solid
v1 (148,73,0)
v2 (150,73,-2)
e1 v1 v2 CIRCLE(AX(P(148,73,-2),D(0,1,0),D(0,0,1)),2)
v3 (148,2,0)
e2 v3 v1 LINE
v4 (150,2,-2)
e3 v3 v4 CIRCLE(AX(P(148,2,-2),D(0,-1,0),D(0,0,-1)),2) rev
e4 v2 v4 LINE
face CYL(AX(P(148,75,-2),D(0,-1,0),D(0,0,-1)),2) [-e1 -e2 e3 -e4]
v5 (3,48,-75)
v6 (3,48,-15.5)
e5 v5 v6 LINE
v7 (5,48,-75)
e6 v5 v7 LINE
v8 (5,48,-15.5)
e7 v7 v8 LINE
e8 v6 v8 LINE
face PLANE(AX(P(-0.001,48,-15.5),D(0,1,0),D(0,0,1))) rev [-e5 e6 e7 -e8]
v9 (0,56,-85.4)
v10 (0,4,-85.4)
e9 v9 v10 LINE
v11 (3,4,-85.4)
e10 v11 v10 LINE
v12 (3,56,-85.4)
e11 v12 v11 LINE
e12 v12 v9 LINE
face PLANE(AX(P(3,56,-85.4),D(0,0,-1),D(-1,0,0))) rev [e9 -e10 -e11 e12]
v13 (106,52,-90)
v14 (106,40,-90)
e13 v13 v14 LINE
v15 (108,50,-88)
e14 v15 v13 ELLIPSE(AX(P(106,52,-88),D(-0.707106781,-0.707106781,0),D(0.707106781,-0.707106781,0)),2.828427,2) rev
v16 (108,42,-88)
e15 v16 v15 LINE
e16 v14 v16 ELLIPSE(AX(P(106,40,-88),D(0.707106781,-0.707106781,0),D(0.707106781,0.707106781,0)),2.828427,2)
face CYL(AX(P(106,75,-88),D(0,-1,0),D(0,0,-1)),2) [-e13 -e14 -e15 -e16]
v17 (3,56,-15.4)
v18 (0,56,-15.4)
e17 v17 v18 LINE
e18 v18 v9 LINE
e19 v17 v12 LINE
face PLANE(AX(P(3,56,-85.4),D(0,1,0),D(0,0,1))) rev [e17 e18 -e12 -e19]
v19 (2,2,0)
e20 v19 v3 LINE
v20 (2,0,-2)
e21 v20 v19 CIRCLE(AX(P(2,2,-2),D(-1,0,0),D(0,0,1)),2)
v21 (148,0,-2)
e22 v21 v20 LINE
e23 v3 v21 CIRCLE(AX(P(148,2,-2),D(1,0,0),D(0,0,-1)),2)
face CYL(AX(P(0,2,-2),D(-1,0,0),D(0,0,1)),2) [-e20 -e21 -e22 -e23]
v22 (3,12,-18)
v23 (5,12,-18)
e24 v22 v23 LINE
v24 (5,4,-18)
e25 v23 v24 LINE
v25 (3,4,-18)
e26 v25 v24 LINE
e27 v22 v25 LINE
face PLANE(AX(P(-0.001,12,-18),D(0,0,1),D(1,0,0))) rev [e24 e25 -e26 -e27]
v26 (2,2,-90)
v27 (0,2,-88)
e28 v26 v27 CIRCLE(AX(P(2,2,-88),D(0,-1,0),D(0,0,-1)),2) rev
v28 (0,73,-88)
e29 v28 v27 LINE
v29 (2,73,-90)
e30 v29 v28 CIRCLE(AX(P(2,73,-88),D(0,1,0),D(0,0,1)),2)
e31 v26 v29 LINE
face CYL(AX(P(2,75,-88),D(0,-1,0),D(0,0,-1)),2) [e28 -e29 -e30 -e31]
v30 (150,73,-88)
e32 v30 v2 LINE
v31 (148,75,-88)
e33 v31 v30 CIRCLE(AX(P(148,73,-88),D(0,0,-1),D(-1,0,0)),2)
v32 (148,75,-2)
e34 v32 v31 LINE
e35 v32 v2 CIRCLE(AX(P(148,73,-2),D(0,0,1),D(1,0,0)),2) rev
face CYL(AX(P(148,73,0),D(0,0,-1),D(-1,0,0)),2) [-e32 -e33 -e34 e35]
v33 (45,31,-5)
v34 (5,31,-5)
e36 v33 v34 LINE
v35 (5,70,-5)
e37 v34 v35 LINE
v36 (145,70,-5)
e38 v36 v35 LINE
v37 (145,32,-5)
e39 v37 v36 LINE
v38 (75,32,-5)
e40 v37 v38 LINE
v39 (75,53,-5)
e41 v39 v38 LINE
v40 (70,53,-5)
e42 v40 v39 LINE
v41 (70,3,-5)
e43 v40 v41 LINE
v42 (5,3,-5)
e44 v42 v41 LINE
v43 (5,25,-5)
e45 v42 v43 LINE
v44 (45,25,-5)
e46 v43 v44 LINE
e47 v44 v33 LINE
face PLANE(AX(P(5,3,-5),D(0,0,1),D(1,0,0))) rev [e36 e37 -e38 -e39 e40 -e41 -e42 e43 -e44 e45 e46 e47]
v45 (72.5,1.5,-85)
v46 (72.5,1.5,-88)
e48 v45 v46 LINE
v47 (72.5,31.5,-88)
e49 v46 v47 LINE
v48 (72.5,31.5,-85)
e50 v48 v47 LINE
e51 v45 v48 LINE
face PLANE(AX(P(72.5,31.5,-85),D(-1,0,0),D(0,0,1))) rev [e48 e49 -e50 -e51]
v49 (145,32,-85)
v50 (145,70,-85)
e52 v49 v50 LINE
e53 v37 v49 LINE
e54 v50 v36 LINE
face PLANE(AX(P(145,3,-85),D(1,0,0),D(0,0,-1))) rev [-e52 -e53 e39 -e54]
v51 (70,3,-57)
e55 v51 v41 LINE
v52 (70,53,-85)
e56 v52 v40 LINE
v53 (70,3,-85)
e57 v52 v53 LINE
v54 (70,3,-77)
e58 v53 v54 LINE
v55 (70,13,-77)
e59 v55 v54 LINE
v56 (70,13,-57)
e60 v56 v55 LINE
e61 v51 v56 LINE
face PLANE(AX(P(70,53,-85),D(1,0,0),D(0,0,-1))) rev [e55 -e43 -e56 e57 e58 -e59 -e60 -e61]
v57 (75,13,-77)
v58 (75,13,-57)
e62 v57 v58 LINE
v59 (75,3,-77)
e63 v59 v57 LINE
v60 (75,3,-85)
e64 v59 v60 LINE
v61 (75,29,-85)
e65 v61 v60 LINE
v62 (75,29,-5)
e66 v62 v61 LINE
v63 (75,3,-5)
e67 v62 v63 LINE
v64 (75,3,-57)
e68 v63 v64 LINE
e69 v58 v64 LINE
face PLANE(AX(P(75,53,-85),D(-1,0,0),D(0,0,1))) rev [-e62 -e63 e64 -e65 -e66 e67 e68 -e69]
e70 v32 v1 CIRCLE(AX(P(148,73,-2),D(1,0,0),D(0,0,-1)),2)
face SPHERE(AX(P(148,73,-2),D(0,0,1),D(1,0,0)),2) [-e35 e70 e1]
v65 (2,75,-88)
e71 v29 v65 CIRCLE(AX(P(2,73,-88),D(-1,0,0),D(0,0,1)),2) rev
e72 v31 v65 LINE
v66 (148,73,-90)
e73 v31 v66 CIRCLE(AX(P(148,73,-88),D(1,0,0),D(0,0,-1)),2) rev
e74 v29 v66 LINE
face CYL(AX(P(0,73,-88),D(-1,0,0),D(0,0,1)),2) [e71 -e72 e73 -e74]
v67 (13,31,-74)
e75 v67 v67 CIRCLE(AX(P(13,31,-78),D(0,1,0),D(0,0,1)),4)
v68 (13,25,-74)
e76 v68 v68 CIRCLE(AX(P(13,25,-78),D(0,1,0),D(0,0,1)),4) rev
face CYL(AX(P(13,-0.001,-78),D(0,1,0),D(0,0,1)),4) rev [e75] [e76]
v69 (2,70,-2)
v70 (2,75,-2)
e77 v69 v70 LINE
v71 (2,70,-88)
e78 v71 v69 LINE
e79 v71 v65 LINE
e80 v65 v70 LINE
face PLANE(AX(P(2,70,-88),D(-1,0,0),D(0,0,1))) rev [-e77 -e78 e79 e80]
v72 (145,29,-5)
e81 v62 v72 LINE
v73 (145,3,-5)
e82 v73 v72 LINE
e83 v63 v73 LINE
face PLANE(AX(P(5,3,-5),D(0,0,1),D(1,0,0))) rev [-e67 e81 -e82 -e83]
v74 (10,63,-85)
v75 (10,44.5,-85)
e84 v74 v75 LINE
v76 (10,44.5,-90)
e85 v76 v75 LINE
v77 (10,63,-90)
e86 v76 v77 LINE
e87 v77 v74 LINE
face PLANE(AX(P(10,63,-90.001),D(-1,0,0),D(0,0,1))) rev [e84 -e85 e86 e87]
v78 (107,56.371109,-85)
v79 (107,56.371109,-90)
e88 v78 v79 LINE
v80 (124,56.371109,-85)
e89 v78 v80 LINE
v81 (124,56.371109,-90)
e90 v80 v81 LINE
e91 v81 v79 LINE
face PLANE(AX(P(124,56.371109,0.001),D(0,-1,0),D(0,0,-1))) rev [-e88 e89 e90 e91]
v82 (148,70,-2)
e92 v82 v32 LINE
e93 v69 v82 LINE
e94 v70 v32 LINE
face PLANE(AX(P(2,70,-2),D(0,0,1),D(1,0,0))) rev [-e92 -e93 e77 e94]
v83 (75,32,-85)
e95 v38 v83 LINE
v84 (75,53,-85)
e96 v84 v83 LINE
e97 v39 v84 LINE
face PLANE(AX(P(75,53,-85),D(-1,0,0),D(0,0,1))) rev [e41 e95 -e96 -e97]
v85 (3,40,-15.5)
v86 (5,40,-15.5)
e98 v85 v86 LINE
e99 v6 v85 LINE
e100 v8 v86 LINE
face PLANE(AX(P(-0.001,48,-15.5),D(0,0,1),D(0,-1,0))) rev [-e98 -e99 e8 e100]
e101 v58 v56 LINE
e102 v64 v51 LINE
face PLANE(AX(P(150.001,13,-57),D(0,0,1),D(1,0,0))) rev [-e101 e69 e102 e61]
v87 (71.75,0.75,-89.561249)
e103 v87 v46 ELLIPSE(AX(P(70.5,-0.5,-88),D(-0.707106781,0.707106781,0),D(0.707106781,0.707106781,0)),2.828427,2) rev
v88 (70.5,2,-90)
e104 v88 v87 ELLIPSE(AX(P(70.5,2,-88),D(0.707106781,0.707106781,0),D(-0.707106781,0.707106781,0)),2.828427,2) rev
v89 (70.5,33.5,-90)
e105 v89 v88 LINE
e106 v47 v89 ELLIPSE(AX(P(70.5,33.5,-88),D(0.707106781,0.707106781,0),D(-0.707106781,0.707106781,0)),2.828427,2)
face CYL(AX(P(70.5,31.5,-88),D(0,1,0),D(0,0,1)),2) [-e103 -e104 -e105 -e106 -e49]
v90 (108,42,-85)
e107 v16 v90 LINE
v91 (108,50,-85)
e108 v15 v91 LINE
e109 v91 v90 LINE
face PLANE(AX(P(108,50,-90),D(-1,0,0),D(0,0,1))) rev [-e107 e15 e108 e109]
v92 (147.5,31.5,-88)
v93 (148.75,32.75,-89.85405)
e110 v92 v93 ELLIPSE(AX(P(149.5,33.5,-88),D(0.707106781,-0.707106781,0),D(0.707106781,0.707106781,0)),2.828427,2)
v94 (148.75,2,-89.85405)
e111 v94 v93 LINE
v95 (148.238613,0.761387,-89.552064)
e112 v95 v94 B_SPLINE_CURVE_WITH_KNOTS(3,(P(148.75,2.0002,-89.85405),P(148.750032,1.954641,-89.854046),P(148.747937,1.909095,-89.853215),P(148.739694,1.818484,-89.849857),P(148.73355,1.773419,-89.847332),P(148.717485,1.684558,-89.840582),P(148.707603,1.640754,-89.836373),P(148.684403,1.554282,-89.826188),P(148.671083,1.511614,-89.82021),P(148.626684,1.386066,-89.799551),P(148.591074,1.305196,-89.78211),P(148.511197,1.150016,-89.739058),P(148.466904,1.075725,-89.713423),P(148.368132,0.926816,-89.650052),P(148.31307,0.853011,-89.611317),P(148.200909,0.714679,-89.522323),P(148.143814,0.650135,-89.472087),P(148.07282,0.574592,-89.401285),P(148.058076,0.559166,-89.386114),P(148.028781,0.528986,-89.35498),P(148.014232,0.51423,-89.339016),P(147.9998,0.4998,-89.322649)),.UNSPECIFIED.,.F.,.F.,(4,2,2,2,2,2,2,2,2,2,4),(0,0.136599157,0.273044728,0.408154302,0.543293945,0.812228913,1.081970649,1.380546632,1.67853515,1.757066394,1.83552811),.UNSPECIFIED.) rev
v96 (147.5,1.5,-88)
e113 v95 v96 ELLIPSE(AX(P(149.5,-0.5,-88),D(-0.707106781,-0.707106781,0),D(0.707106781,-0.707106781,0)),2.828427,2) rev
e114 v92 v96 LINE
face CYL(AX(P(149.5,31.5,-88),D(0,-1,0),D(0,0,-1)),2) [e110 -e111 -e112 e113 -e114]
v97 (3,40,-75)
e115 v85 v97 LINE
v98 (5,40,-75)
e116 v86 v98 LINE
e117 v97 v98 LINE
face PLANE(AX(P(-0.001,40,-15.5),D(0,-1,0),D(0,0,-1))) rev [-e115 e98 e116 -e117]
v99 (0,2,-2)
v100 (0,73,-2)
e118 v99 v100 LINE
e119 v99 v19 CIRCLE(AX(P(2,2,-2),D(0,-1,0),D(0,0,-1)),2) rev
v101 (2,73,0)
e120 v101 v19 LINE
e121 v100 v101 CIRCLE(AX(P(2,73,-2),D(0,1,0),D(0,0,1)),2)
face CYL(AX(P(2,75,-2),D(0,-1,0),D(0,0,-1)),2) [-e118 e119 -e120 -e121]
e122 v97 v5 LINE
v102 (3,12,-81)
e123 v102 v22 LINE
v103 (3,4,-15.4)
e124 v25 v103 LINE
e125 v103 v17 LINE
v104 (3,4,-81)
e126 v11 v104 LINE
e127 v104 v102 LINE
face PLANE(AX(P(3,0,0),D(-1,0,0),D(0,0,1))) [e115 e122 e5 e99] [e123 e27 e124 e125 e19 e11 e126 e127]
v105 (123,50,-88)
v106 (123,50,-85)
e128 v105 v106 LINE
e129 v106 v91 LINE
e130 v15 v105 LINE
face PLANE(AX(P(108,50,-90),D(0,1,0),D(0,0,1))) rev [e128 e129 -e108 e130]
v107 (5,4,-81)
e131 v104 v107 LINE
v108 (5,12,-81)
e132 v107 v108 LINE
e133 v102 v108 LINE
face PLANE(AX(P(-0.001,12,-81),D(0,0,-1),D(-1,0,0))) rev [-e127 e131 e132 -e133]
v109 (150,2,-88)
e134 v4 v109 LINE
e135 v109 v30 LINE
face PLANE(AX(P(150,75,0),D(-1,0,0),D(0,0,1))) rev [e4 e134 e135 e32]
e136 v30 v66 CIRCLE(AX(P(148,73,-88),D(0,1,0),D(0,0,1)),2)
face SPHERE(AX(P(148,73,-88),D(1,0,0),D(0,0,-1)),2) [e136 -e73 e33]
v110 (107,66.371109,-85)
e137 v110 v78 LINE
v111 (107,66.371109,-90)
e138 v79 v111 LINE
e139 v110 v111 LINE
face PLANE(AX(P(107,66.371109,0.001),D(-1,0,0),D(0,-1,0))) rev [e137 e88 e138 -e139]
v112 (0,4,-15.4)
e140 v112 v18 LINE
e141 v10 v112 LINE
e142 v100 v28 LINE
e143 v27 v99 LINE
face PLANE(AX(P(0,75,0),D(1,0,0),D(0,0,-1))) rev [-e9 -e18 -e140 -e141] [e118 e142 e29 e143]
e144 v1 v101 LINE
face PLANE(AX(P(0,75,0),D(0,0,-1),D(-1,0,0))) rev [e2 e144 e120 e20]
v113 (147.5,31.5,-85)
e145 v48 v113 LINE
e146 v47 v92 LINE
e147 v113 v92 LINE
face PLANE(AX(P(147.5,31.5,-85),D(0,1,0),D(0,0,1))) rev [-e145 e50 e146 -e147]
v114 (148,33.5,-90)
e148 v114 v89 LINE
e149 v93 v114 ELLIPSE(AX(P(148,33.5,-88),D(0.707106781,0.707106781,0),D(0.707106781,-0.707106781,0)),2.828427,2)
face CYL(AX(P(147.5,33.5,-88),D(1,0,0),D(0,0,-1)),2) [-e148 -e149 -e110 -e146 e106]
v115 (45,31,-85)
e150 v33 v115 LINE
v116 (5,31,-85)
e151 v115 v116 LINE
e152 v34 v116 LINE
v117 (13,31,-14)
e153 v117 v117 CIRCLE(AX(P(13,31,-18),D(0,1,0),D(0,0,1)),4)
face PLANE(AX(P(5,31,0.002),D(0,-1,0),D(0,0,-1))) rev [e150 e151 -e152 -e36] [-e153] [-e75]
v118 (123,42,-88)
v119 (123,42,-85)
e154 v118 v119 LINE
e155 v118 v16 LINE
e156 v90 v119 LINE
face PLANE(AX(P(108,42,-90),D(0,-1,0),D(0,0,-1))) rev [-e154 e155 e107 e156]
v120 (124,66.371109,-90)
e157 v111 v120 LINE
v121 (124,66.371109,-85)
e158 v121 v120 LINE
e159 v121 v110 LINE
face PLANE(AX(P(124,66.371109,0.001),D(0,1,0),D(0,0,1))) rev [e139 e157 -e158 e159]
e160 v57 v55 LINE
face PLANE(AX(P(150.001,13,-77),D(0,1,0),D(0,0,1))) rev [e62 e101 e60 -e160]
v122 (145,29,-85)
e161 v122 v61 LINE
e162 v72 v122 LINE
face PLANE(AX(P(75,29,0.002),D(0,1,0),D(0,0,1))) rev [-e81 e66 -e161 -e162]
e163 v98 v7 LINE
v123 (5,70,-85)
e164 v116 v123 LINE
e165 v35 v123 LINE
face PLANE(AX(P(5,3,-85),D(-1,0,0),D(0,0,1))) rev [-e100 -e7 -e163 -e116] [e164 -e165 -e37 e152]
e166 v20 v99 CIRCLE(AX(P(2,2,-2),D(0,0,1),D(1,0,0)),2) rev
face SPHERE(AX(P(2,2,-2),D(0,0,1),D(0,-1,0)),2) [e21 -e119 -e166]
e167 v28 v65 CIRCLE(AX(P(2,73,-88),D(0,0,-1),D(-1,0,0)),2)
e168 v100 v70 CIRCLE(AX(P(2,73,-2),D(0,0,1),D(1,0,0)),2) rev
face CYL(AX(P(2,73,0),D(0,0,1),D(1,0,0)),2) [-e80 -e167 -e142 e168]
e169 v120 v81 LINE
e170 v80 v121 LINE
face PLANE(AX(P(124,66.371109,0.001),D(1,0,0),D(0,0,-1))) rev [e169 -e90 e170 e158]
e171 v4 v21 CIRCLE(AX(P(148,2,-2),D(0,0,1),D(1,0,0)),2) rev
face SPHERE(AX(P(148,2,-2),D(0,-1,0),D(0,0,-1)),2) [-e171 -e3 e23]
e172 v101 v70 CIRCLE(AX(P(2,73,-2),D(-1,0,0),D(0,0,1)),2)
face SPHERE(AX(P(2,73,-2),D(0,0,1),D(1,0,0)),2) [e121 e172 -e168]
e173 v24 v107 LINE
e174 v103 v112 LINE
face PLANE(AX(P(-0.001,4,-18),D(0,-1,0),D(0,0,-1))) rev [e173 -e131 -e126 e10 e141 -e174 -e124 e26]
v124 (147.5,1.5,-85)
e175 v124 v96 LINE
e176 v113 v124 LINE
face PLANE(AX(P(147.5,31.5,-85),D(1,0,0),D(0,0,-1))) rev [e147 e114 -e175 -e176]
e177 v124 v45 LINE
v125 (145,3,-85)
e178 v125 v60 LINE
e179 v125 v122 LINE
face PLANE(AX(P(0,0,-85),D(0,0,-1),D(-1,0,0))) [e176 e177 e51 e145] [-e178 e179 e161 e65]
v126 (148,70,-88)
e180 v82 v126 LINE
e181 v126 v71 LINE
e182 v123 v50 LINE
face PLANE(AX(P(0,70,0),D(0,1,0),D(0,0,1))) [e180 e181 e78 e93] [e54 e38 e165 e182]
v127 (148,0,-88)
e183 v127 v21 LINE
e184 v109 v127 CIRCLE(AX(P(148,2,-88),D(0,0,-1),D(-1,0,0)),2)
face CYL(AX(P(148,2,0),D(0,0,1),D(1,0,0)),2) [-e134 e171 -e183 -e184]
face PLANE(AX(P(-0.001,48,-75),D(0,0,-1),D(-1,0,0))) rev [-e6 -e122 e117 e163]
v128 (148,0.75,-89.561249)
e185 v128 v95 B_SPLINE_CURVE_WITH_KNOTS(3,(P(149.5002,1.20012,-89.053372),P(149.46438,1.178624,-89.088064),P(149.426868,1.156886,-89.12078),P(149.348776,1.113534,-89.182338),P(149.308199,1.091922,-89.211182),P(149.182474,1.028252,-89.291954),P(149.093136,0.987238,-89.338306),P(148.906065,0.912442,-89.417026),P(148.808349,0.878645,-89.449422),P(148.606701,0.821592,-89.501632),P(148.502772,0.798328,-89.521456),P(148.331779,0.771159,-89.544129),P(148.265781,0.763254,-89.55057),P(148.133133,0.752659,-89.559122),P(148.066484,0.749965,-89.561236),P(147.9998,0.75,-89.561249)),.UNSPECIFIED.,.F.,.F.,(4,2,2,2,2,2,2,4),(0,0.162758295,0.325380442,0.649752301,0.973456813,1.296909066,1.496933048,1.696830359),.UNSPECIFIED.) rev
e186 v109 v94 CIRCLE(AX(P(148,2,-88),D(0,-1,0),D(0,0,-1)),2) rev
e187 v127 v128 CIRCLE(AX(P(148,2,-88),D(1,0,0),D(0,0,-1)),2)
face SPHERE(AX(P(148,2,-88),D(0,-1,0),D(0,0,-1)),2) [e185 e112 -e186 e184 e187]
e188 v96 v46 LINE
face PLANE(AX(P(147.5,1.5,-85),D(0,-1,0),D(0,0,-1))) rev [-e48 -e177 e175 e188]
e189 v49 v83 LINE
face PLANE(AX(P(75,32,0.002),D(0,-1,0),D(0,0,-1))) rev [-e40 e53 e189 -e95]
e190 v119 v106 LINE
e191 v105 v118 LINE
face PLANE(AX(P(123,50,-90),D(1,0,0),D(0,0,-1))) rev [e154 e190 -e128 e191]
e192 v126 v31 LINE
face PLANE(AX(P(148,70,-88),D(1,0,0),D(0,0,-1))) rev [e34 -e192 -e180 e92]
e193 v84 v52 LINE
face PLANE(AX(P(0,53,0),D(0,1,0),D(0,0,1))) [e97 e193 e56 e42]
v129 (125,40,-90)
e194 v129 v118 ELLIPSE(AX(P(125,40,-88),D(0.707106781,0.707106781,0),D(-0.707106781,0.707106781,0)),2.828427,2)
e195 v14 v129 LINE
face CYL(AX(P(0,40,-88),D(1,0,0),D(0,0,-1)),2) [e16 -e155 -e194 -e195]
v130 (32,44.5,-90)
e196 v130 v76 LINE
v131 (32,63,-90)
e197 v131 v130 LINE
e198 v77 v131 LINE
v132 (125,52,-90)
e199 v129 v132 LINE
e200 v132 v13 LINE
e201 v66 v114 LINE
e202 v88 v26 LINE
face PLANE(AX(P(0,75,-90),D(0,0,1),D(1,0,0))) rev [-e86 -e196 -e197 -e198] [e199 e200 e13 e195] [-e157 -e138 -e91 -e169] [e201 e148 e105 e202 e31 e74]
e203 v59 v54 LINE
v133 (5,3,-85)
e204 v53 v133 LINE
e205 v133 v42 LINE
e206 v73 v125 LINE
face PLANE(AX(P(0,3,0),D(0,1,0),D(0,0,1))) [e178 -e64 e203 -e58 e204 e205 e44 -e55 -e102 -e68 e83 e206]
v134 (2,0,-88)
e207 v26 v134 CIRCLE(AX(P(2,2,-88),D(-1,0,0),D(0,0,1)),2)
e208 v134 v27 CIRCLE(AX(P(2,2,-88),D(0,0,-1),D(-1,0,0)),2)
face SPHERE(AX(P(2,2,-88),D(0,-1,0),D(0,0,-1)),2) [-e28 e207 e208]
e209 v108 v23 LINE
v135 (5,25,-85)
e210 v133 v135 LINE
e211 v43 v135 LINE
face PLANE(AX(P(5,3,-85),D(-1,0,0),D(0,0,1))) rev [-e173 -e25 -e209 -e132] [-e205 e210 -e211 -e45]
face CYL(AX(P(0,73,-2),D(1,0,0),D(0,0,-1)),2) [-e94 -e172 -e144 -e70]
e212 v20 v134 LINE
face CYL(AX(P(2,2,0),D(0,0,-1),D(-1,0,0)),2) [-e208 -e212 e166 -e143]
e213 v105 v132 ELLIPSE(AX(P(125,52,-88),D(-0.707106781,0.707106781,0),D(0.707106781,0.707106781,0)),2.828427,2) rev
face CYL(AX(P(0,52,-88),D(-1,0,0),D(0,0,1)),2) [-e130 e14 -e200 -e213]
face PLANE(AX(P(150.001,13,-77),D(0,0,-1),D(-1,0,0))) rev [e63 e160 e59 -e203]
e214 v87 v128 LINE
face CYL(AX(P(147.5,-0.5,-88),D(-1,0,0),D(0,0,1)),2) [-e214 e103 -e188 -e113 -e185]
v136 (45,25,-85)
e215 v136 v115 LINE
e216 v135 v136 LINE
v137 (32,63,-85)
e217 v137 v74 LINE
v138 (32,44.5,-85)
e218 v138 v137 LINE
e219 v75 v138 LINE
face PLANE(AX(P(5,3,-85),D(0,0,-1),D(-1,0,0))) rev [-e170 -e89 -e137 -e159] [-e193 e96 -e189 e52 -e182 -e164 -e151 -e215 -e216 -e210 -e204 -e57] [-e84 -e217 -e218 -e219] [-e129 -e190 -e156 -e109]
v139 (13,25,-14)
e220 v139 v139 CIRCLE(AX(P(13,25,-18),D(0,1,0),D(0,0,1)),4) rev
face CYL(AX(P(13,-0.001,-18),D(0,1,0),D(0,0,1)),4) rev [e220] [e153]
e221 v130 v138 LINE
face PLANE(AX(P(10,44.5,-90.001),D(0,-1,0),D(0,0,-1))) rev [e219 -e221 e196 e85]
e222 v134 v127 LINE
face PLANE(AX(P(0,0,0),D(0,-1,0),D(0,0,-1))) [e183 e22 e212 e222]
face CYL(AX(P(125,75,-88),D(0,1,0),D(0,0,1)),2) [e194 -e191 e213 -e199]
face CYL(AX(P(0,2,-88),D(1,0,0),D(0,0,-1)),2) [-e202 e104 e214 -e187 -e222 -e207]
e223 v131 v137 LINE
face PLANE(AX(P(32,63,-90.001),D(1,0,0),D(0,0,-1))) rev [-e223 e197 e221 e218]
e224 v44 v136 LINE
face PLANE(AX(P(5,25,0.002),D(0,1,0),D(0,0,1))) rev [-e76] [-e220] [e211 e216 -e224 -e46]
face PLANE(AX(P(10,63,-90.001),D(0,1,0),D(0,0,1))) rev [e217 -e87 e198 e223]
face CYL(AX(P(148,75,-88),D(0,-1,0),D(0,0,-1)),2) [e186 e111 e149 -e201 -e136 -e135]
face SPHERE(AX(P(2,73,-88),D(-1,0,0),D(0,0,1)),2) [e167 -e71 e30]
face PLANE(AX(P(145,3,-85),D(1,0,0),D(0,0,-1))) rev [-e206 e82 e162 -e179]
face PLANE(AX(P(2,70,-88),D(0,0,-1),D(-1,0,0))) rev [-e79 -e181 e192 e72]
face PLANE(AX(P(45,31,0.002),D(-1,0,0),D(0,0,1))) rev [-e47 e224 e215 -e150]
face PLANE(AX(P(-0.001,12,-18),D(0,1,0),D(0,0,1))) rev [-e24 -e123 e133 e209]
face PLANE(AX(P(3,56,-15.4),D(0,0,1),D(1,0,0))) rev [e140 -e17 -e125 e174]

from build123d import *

# Parameters (mm, degrees)
SKETCH_2_W           = 150
SKETCH_2_H           = 90
EXTRUDE_1_DEPTH      = 75
SKETCH_3_W           = 140
SKETCH_3_H           = 80
CUT_EXTRUDE_2_DEPTH  = 72
SKETCH_6_W           = 5
SKETCH_6_H           = 80
EXTRUDE_2_DEPTH      = 50
EXTRUDE_3_REACH      = 190.016
SKETCH_8_W           = 70
SKETCH_8_H           = 3
CUT_EXTRUDE_3_REACH  = 143.863
SKETCH_9_W           = 20
SKETCH_9_H           = 10
CUT_EXTRUDE_4_REACH  = 190.016
SKETCH_10_W          = 70
SKETCH_10_H          = 26
SKETCH_11_W          = 75
SKETCH_11_H          = 30
CUT_EXTRUDE_5_DEPTH  = 5
SKETCH_12_W          = 15
SKETCH_12_H          = 8
CUT_EXTRUDE_6_DEPTH  = 5
FILLET_1_R           = 2
EXTRUDE_4_REACH      = 190.016
SKETCH_13_W          = 40
SKETCH_13_H          = 6
CUT_EXTRUDE_7_REACH  = 182.377
SKETCH_14_R          = 4
CUT_EXTRUDE_8_REACH  = 188.414
SKETCH_15_W          = 63
SKETCH_15_H          = 8
CUT_EXTRUDE_9_REACH  = 188.414
SKETCH_16_W          = 59.5
SKETCH_16_H          = 8
SKETCH_17_W          = 70
SKETCH_17_H          = 52
CUT_EXTRUDE_10_DEPTH = 3
CUT_EXTRUDE_11_REACH = 190.016
SKETCH_18_W          = 22
SKETCH_18_H          = 18.5
SKETCH_19_W          = 146
SKETCH_19_H          = 86
CUT_EXTRUDE_12_DEPTH = 5
CUT_EXTRUDE_13_REACH = 192.329
SKETCH_20_W          = 17
SKETCH_20_H          = 10


with BuildPart() as part:
    # 草图2 → 凸台-拉伸1 (new body)
    with BuildSketch(Plane(origin=(0, 0, 0), x_dir=(1, 0, 0), z_dir=(0, 1, 0))):
        with Locations((75, 45)):
            Rectangle(SKETCH_2_W, SKETCH_2_H)
    extrude(amount=EXTRUDE_1_DEPTH)

    # 草图3 → 切除-拉伸2 (cut)
    with BuildSketch(Plane(origin=(0, 75, 0), x_dir=(1, 0, 0), z_dir=(0, 1, 0))):
        with Locations((75, 45)):
            Rectangle(SKETCH_3_W, SKETCH_3_H)
    extrude(amount=-CUT_EXTRUDE_2_DEPTH, mode=Mode.SUBTRACT)

    # 草图6 → 凸台-拉伸2 (add)
    with BuildSketch(Plane(origin=(0, 3, 0), x_dir=(1, 0, 0), z_dir=(0, 1, 0))):
        with Locations((72.5, 45)):
            Rectangle(SKETCH_6_W, SKETCH_6_H)
    extrude(amount=EXTRUDE_2_DEPTH)

    # 草图8 → 凸台-拉伸3 (add, up to next)
    with BuildSketch(Plane.XY.offset(-85), mode=Mode.PRIVATE) as extrude_3_sk1:
        with Locations((110, 30.5)):
            Rectangle(SKETCH_8_W, SKETCH_8_H)
    extrude_3_tool1 = extrude(extrude_3_sk1.sketch, amount=EXTRUDE_3_REACH, mode=Mode.PRIVATE) - part.part
    add(extrude_3_tool1.solids().sort_by_distance((110, 30.5, -85))[0])

    # 草图9 → 切除-拉伸3 (cut, up to next)
    with BuildSketch(Plane.ZY.offset(-70), mode=Mode.PRIVATE) as cut_extrude_3_sk1:
        with Locations((-67, 8)):
            Rectangle(SKETCH_9_W, SKETCH_9_H)
    cut_extrude_3_tool1 = extrude(cut_extrude_3_sk1.sketch, amount=-CUT_EXTRUDE_3_REACH, mode=Mode.PRIVATE) & part.part
    add(cut_extrude_3_tool1.solids().sort_by_distance((70, 8, -67))[0], mode=Mode.SUBTRACT)

    # 草图10 → 切除-拉伸4 (cut, up to next)
    with BuildSketch(Plane.XY.offset(-85), mode=Mode.PRIVATE) as cut_extrude_4_sk1:
        with Locations((110, 16)):
            Rectangle(SKETCH_10_W, SKETCH_10_H)
    cut_extrude_4_tool1 = extrude(cut_extrude_4_sk1.sketch, amount=-CUT_EXTRUDE_4_REACH, mode=Mode.PRIVATE) & part.part
    add(cut_extrude_4_tool1.solids().sort_by_distance((110, 16, -85))[0], mode=Mode.SUBTRACT)

    # 草图11 → 切除-拉伸5 (cut)
    with BuildSketch(Plane(origin=(0, 0, -90), x_dir=(-1, 0, 0), z_dir=(0, 0, -1))):
        with Locations((-110, 16.5)):
            Rectangle(SKETCH_11_W, SKETCH_11_H)
    extrude(amount=-CUT_EXTRUDE_5_DEPTH, mode=Mode.SUBTRACT)

    # 草图12 → 切除-拉伸6 (cut)
    with BuildSketch(Plane.XY.offset(-85)):
        with Locations((115.5, 46)):
            Rectangle(SKETCH_12_W, SKETCH_12_H)
    extrude(amount=-CUT_EXTRUDE_6_DEPTH, mode=Mode.SUBTRACT)

    # 圆角1
    # the kernel refuses this fillet: 2 mm, written as the material it takes off along each edge
    with BuildSketch(Plane(origin=(148, 73, -2), x_dir=(1, 0, 0), z_dir=(0, 0, 1))) as fillet_1_piece_1_section:
        Polygon((0, 0), (FILLET_1_R * 1.02, 0), (FILLET_1_R * 1.02, FILLET_1_R * 1.02), (0, FILLET_1_R * 1.02), align=None)
    fillet_1_piece_1 = extrude(amount=FILLET_1_R * 1.02, mode=Mode.PRIVATE)
    fillet_1_piece_1 = fillet_1_piece_1 - Plane(origin=(148, 73, -2), x_dir=(-0.7071067811865475, -0.7071067811865475, 0), z_dir=(0, 0, 1)) * Sphere(FILLET_1_R, mode=Mode.PRIVATE)
    add(fillet_1_piece_1, mode=Mode.SUBTRACT)
    with BuildSketch(Plane(origin=(148, 73, -88), x_dir=(0, 1, 0), z_dir=(1, 0, 0))) as fillet_1_piece_2_section:
        Polygon((0, 0), (FILLET_1_R * 1.02, 0), (FILLET_1_R * 1.02, -FILLET_1_R * 1.02), (0, -FILLET_1_R * 1.02), align=None)
    fillet_1_piece_2 = extrude(amount=FILLET_1_R * 1.02, mode=Mode.PRIVATE)
    fillet_1_piece_2 = fillet_1_piece_2 - Plane(origin=(148, 73, -88), x_dir=(0, -0.7071067811865475, 0.7071067811865475), z_dir=(1, 0, 0)) * Sphere(FILLET_1_R, mode=Mode.PRIVATE)
    add(fillet_1_piece_2, mode=Mode.SUBTRACT)
    with BuildSketch(Plane(origin=(2, 73, -88), x_dir=(0, 1, 0), z_dir=(-1, 0, 0))) as fillet_1_piece_3_section:
        Polygon((0, 0), (FILLET_1_R * 1.02, 0), (FILLET_1_R * 1.02, FILLET_1_R * 1.02), (0, FILLET_1_R * 1.02), align=None)
    fillet_1_piece_3 = extrude(amount=FILLET_1_R * 1.02, mode=Mode.PRIVATE)
    fillet_1_piece_3 = fillet_1_piece_3 - Plane(origin=(2, 73, -88), x_dir=(0, -0.7071067811865475, 0.7071067811865475), z_dir=(-1, 0, 0)) * Sphere(FILLET_1_R, mode=Mode.PRIVATE)
    add(fillet_1_piece_3, mode=Mode.SUBTRACT)
    with BuildSketch(Plane(origin=(2, 73, -2), x_dir=(-1, 0, 0), z_dir=(0, 0, 1))) as fillet_1_piece_4_section:
        Polygon((0, 0), (FILLET_1_R * 1.02, 0), (FILLET_1_R * 1.02, -FILLET_1_R * 1.02), (0, -FILLET_1_R * 1.02), align=None)
    fillet_1_piece_4 = extrude(amount=FILLET_1_R * 1.02, mode=Mode.PRIVATE)
    fillet_1_piece_4 = fillet_1_piece_4 - Plane(origin=(2, 73, -2), x_dir=(0.7071067811865475, -0.7071067811865475, 0), z_dir=(0, 0, 1)) * Sphere(FILLET_1_R, mode=Mode.PRIVATE)
    add(fillet_1_piece_4, mode=Mode.SUBTRACT)
    with BuildSketch(Plane(origin=(148, 2, -88), x_dir=(0, -1, 0), z_dir=(1, 0, 0))) as fillet_1_piece_5_section:
        Polygon((0, 0), (FILLET_1_R * 1.02, 0), (FILLET_1_R * 1.02, FILLET_1_R * 1.02), (0, FILLET_1_R * 1.02), align=None)
    fillet_1_piece_5 = extrude(amount=FILLET_1_R * 1.02, mode=Mode.PRIVATE)
    fillet_1_piece_5 = fillet_1_piece_5 - Plane(origin=(148, 2, -88), x_dir=(0, 0.7071067811865475, 0.7071067811865475), z_dir=(1, 0, 0)) * Sphere(FILLET_1_R, mode=Mode.PRIVATE)
    add(fillet_1_piece_5, mode=Mode.SUBTRACT)
    with BuildSketch(Plane(origin=(2, 2, -88), x_dir=(0, -1, 0), z_dir=(-1, 0, 0))) as fillet_1_piece_6_section:
        Polygon((0, 0), (FILLET_1_R * 1.02, 0), (FILLET_1_R * 1.02, -FILLET_1_R * 1.02), (0, -FILLET_1_R * 1.02), align=None)
    fillet_1_piece_6 = extrude(amount=FILLET_1_R * 1.02, mode=Mode.PRIVATE)
    fillet_1_piece_6 = fillet_1_piece_6 - Plane(origin=(2, 2, -88), x_dir=(0, 0.7071067811865475, 0.7071067811865475), z_dir=(-1, 0, 0)) * Sphere(FILLET_1_R, mode=Mode.PRIVATE)
    add(fillet_1_piece_6, mode=Mode.SUBTRACT)
    with BuildSketch(Plane(origin=(148, 2, -2), x_dir=(1, 0, 0), z_dir=(0, 0, 1))) as fillet_1_piece_7_section:
        Polygon((0, 0), (FILLET_1_R * 1.02, 0), (FILLET_1_R * 1.02, -FILLET_1_R * 1.02), (0, -FILLET_1_R * 1.02), align=None)
    fillet_1_piece_7 = extrude(amount=FILLET_1_R * 1.02, mode=Mode.PRIVATE)
    fillet_1_piece_7 = fillet_1_piece_7 - Plane(origin=(148, 2, -2), x_dir=(-0.7071067811865475, 0.7071067811865475, 0), z_dir=(0, 0, 1)) * Sphere(FILLET_1_R, mode=Mode.PRIVATE)
    add(fillet_1_piece_7, mode=Mode.SUBTRACT)
    with BuildSketch(Plane(origin=(2, 2, -2), x_dir=(-1, 0, 0), z_dir=(0, 0, 1))) as fillet_1_piece_8_section:
        Polygon((0, 0), (FILLET_1_R * 1.02, 0), (FILLET_1_R * 1.02, FILLET_1_R * 1.02), (0, FILLET_1_R * 1.02), align=None)
    fillet_1_piece_8 = extrude(amount=FILLET_1_R * 1.02, mode=Mode.PRIVATE)
    fillet_1_piece_8 = fillet_1_piece_8 - Plane(origin=(2, 2, -2), x_dir=(0.7071067811865475, 0.7071067811865475, 0), z_dir=(0, 0, 1)) * Sphere(FILLET_1_R, mode=Mode.PRIVATE)
    add(fillet_1_piece_8, mode=Mode.SUBTRACT)
    with BuildSketch(Plane(origin=(147.5, 1.5, -90), x_dir=(1, 0, 0), z_dir=(0, 1, 0)), Plane(origin=(72.5, 31.5, -90), x_dir=(-1, 0, 0), z_dir=(0, -1, 0))) as fillet_1_piece_9:
        with BuildLine():
            CenterArc((FILLET_1_R, -FILLET_1_R), FILLET_1_R, 90, 90)
            Line((0, -FILLET_1_R), (-FILLET_1_R * 0.02, -FILLET_1_R))
            Line((-FILLET_1_R * 0.02, -FILLET_1_R), (-FILLET_1_R * 0.02, FILLET_1_R * 0.02))
            Line((-FILLET_1_R * 0.02, FILLET_1_R * 0.02), (FILLET_1_R, FILLET_1_R * 0.02))
            Line((FILLET_1_R, FILLET_1_R * 0.02), (FILLET_1_R, 0))
        make_face()
    extrude(amount=30, mode=Mode.SUBTRACT)
    with BuildSketch(Plane(origin=(72.5, 1.5, -90), x_dir=(0, -1, 0), z_dir=(1, 0, 0)), Plane(origin=(147.5, 31.5, -90), x_dir=(0, 1, 0), z_dir=(-1, 0, 0))) as fillet_1_piece_10:
        with BuildLine():
            CenterArc((FILLET_1_R, -FILLET_1_R), FILLET_1_R, 90, 90)
            Line((0, -FILLET_1_R), (-FILLET_1_R * 0.02, -FILLET_1_R))
            Line((-FILLET_1_R * 0.02, -FILLET_1_R), (-FILLET_1_R * 0.02, FILLET_1_R * 0.02))
            Line((-FILLET_1_R * 0.02, FILLET_1_R * 0.02), (FILLET_1_R, FILLET_1_R * 0.02))
            Line((FILLET_1_R, FILLET_1_R * 0.02), (FILLET_1_R, 0))
        make_face()
    extrude(amount=75, mode=Mode.SUBTRACT)
    with BuildSketch(Plane(origin=(108, 42, -90), x_dir=(-1, 0, 0), z_dir=(0, 1, 0)), Plane(origin=(123, 50, -90), x_dir=(1, 0, 0), z_dir=(0, -1, 0))) as fillet_1_piece_11:
        with BuildLine():
            CenterArc((FILLET_1_R, FILLET_1_R), FILLET_1_R, 180, 90)
            Line((0, FILLET_1_R), (-FILLET_1_R * 0.02, FILLET_1_R))
            Line((-FILLET_1_R * 0.02, FILLET_1_R), (-FILLET_1_R * 0.02, -FILLET_1_R * 0.02))
            Line((-FILLET_1_R * 0.02, -FILLET_1_R * 0.02), (FILLET_1_R, -FILLET_1_R * 0.02))
            Line((FILLET_1_R, -FILLET_1_R * 0.02), (FILLET_1_R, 0))
        make_face()
    extrude(amount=8, mode=Mode.SUBTRACT)
    with BuildSketch(Plane(origin=(108, 50, -90), x_dir=(0, 1, 0), z_dir=(1, 0, 0)), Plane(origin=(123, 42, -90), x_dir=(0, -1, 0), z_dir=(-1, 0, 0))) as fillet_1_piece_12:
        with BuildLine():
            CenterArc((FILLET_1_R, FILLET_1_R), FILLET_1_R, 180, 90)
            Line((0, FILLET_1_R), (-FILLET_1_R * 0.02, FILLET_1_R))
            Line((-FILLET_1_R * 0.02, FILLET_1_R), (-FILLET_1_R * 0.02, -FILLET_1_R * 0.02))
            Line((-FILLET_1_R * 0.02, -FILLET_1_R * 0.02), (FILLET_1_R, -FILLET_1_R * 0.02))
            Line((FILLET_1_R, -FILLET_1_R * 0.02), (FILLET_1_R, 0))
        make_face()
    extrude(amount=15, mode=Mode.SUBTRACT)
    with BuildSketch(Plane(origin=(150, 75, -2), x_dir=(0, -1, 0), z_dir=(0, 0, -1)), Plane(origin=(0, 75, -88), x_dir=(0, -1, 0), z_dir=(0, 0, 1))) as fillet_1_piece_13:
        with BuildLine():
            CenterArc((FILLET_1_R, FILLET_1_R), FILLET_1_R, 180, 90)
            Line((0, FILLET_1_R), (-FILLET_1_R * 0.02, FILLET_1_R))
            Line((-FILLET_1_R * 0.02, FILLET_1_R), (-FILLET_1_R * 0.02, -FILLET_1_R * 0.02))
            Line((-FILLET_1_R * 0.02, -FILLET_1_R * 0.02), (FILLET_1_R, -FILLET_1_R * 0.02))
            Line((FILLET_1_R, -FILLET_1_R * 0.02), (FILLET_1_R, 0))
        make_face()
    extrude(amount=86, mode=Mode.SUBTRACT)
    with BuildSketch(Plane(origin=(148, 75, -90), x_dir=(0, 0, 1), z_dir=(-1, 0, 0)), Plane(origin=(2, 0, 0), x_dir=(0, 1, 0), z_dir=(1, 0, 0))) as fillet_1_piece_14:
        with BuildLine():
            CenterArc((FILLET_1_R, -FILLET_1_R), FILLET_1_R, 90, 90)
            Line((0, -FILLET_1_R), (-FILLET_1_R * 0.02, -FILLET_1_R))
            Line((-FILLET_1_R * 0.02, -FILLET_1_R), (-FILLET_1_R * 0.02, FILLET_1_R * 0.02))
            Line((-FILLET_1_R * 0.02, FILLET_1_R * 0.02), (FILLET_1_R, FILLET_1_R * 0.02))
            Line((FILLET_1_R, FILLET_1_R * 0.02), (FILLET_1_R, 0))
        make_face()
    extrude(amount=146, mode=Mode.SUBTRACT)
    with BuildSketch(Plane(origin=(148, 0, -90), x_dir=(0, 0, 1), z_dir=(-1, 0, 0)), Plane(origin=(2, 75, 0), x_dir=(0, -1, 0), z_dir=(1, 0, 0))) as fillet_1_piece_15:
        with BuildLine():
            CenterArc((FILLET_1_R, FILLET_1_R), FILLET_1_R, 180, 90)
            Line((0, FILLET_1_R), (-FILLET_1_R * 0.02, FILLET_1_R))
            Line((-FILLET_1_R * 0.02, FILLET_1_R), (-FILLET_1_R * 0.02, -FILLET_1_R * 0.02))
            Line((-FILLET_1_R * 0.02, -FILLET_1_R * 0.02), (FILLET_1_R, -FILLET_1_R * 0.02))
            Line((FILLET_1_R, -FILLET_1_R * 0.02), (FILLET_1_R, 0))
        make_face()
    extrude(amount=146, mode=Mode.SUBTRACT)
    with BuildSketch(Plane(origin=(150, 0, -2), x_dir=(0, 1, 0), z_dir=(0, 0, -1)), Plane(origin=(0, 0, -88), x_dir=(0, 1, 0), z_dir=(0, 0, 1))) as fillet_1_piece_16:
        with BuildLine():
            CenterArc((FILLET_1_R, -FILLET_1_R), FILLET_1_R, 90, 90)
            Line((0, -FILLET_1_R), (-FILLET_1_R * 0.02, -FILLET_1_R))
            Line((-FILLET_1_R * 0.02, -FILLET_1_R), (-FILLET_1_R * 0.02, FILLET_1_R * 0.02))
            Line((-FILLET_1_R * 0.02, FILLET_1_R * 0.02), (FILLET_1_R, FILLET_1_R * 0.02))
            Line((FILLET_1_R, FILLET_1_R * 0.02), (FILLET_1_R, 0))
        make_face()
    extrude(amount=86, mode=Mode.SUBTRACT)
    with BuildSketch(Plane(origin=(0, 2, -90), x_dir=(0, 0, 1), z_dir=(0, 1, 0)), Plane(origin=(0, 2, 0), x_dir=(1, 0, 0), z_dir=(0, 1, 0))) as fillet_1_piece_17:
        with BuildLine():
            CenterArc((FILLET_1_R, FILLET_1_R), FILLET_1_R, 180, 90)
            Line((0, FILLET_1_R), (-FILLET_1_R * 0.02, FILLET_1_R))
            Line((-FILLET_1_R * 0.02, FILLET_1_R), (-FILLET_1_R * 0.02, -FILLET_1_R * 0.02))
            Line((-FILLET_1_R * 0.02, -FILLET_1_R * 0.02), (FILLET_1_R, -FILLET_1_R * 0.02))
            Line((FILLET_1_R, -FILLET_1_R * 0.02), (FILLET_1_R, 0))
        make_face()
    extrude(amount=71, mode=Mode.SUBTRACT)
    with BuildSketch(Plane(origin=(150, 2, -90), x_dir=(0, 0, 1), z_dir=(0, 1, 0)), Plane(origin=(150, 2, 0), x_dir=(-1, 0, 0), z_dir=(0, 1, 0))) as fillet_1_piece_18:
        with BuildLine():
            CenterArc((FILLET_1_R, -FILLET_1_R), FILLET_1_R, 90, 90)
            Line((0, -FILLET_1_R), (-FILLET_1_R * 0.02, -FILLET_1_R))
            Line((-FILLET_1_R * 0.02, -FILLET_1_R), (-FILLET_1_R * 0.02, FILLET_1_R * 0.02))
            Line((-FILLET_1_R * 0.02, FILLET_1_R * 0.02), (FILLET_1_R, FILLET_1_R * 0.02))
            Line((FILLET_1_R, FILLET_1_R * 0.02), (FILLET_1_R, 0))
        make_face()
    extrude(amount=71, mode=Mode.SUBTRACT)
    with BuildSketch(Plane(origin=(147.5, -3.5, -90), x_dir=(1, 0, 0), z_dir=(0, 1, 0))) as fillet_1_piece_19a_section:
        with BuildLine():
            CenterArc((FILLET_1_R, -FILLET_1_R), FILLET_1_R, 90, 90)
            Line((0, -FILLET_1_R), (-FILLET_1_R * 0.02, -FILLET_1_R))
            Line((-FILLET_1_R * 0.02, -FILLET_1_R), (-FILLET_1_R * 0.02, FILLET_1_R * 0.02))
            Line((-FILLET_1_R * 0.02, FILLET_1_R * 0.02), (FILLET_1_R, FILLET_1_R * 0.02))
            Line((FILLET_1_R, FILLET_1_R * 0.02), (FILLET_1_R, 0))
        make_face()
    fillet_1_piece_19a = extrude(amount=35, mode=Mode.PRIVATE)
    fillet_1_piece_19a = split(fillet_1_piece_19a, bisect_by=Plane(origin=(147.952790229, 1.5, -89.547209771), z_dir=(0, -1, 0)), keep=Keep.TOP, mode=Mode.PRIVATE)
    with BuildSketch(Plane(origin=(72.5, 1.5, -90), x_dir=(0, -1, 0), z_dir=(1, 0, 0))) as fillet_1_piece_19b_section:
        with BuildLine():
            CenterArc((FILLET_1_R, -FILLET_1_R), FILLET_1_R, 90, 90)
            Line((0, -FILLET_1_R), (-FILLET_1_R * 0.02, -FILLET_1_R))
            Line((-FILLET_1_R * 0.02, -FILLET_1_R), (-FILLET_1_R * 0.02, FILLET_1_R * 0.02))
            Line((-FILLET_1_R * 0.02, FILLET_1_R * 0.02), (FILLET_1_R, FILLET_1_R * 0.02))
            Line((FILLET_1_R, FILLET_1_R * 0.02), (FILLET_1_R, 0))
        make_face()
    fillet_1_piece_19b = extrude(amount=80, mode=Mode.PRIVATE)
    fillet_1_piece_19b = split(fillet_1_piece_19b, bisect_by=Plane(origin=(147.5, 1.047209771, -89.547209771), z_dir=(1, 0, 0)), keep=Keep.TOP, mode=Mode.PRIVATE)
    fillet_1_piece_19 = fillet_1_piece_19a & fillet_1_piece_19b
    add(fillet_1_piece_19, mode=Mode.SUBTRACT)
    with BuildSketch(Plane(origin=(152.5, 31.5, -90), x_dir=(0, 1, 0), z_dir=(-1, 0, 0))) as fillet_1_piece_20a_section:
        with BuildLine():
            CenterArc((FILLET_1_R, -FILLET_1_R), FILLET_1_R, 90, 90)
            Line((0, -FILLET_1_R), (-FILLET_1_R * 0.02, -FILLET_1_R))
            Line((-FILLET_1_R * 0.02, -FILLET_1_R), (-FILLET_1_R * 0.02, FILLET_1_R * 0.02))
            Line((-FILLET_1_R * 0.02, FILLET_1_R * 0.02), (FILLET_1_R, FILLET_1_R * 0.02))
            Line((FILLET_1_R, FILLET_1_R * 0.02), (FILLET_1_R, 0))
        make_face()
    fillet_1_piece_20a = extrude(amount=80, mode=Mode.PRIVATE)
    fillet_1_piece_20a = split(fillet_1_piece_20a, bisect_by=Plane(origin=(147.5, 31.952790229, -89.547209771), z_dir=(1, 0, 0)), keep=Keep.TOP, mode=Mode.PRIVATE)
    with BuildSketch(Plane(origin=(147.5, 1.5, -90), x_dir=(1, 0, 0), z_dir=(0, 1, 0))) as fillet_1_piece_20b_section:
        with BuildLine():
            CenterArc((FILLET_1_R, -FILLET_1_R), FILLET_1_R, 90, 90)
            Line((0, -FILLET_1_R), (-FILLET_1_R * 0.02, -FILLET_1_R))
            Line((-FILLET_1_R * 0.02, -FILLET_1_R), (-FILLET_1_R * 0.02, FILLET_1_R * 0.02))
            Line((-FILLET_1_R * 0.02, FILLET_1_R * 0.02), (FILLET_1_R, FILLET_1_R * 0.02))
            Line((FILLET_1_R, FILLET_1_R * 0.02), (FILLET_1_R, 0))
        make_face()
    fillet_1_piece_20b = extrude(amount=35, mode=Mode.PRIVATE)
    fillet_1_piece_20b = split(fillet_1_piece_20b, bisect_by=Plane(origin=(147.952790229, 31.5, -89.547209771), z_dir=(0, 1, 0)), keep=Keep.TOP, mode=Mode.PRIVATE)
    fillet_1_piece_20 = fillet_1_piece_20a & fillet_1_piece_20b
    add(fillet_1_piece_20, mode=Mode.SUBTRACT)
    with BuildSketch(Plane(origin=(72.5, 31.5, -90), x_dir=(-1, 0, 0), z_dir=(0, -1, 0))) as fillet_1_piece_21a_section:
        with BuildLine():
            CenterArc((FILLET_1_R, -FILLET_1_R), FILLET_1_R, 90, 90)
            Line((0, -FILLET_1_R), (-FILLET_1_R * 0.02, -FILLET_1_R))
            Line((-FILLET_1_R * 0.02, -FILLET_1_R), (-FILLET_1_R * 0.02, FILLET_1_R * 0.02))
            Line((-FILLET_1_R * 0.02, FILLET_1_R * 0.02), (FILLET_1_R, FILLET_1_R * 0.02))
            Line((FILLET_1_R, FILLET_1_R * 0.02), (FILLET_1_R, 0))
        make_face()
    fillet_1_piece_21a = extrude(amount=35, mode=Mode.PRIVATE)
    fillet_1_piece_21a = split(fillet_1_piece_21a, bisect_by=Plane(origin=(72.047209771, 1.5, -89.547209771), z_dir=(0, -1, 0)), keep=Keep.TOP, mode=Mode.PRIVATE)
    with BuildSketch(Plane(origin=(67.5, 1.5, -90), x_dir=(0, -1, 0), z_dir=(1, 0, 0))) as fillet_1_piece_21b_section:
        with BuildLine():
            CenterArc((FILLET_1_R, -FILLET_1_R), FILLET_1_R, 90, 90)
            Line((0, -FILLET_1_R), (-FILLET_1_R * 0.02, -FILLET_1_R))
            Line((-FILLET_1_R * 0.02, -FILLET_1_R), (-FILLET_1_R * 0.02, FILLET_1_R * 0.02))
            Line((-FILLET_1_R * 0.02, FILLET_1_R * 0.02), (FILLET_1_R, FILLET_1_R * 0.02))
            Line((FILLET_1_R, FILLET_1_R * 0.02), (FILLET_1_R, 0))
        make_face()
    fillet_1_piece_21b = extrude(amount=80, mode=Mode.PRIVATE)
    fillet_1_piece_21b = split(fillet_1_piece_21b, bisect_by=Plane(origin=(72.5, 1.047209771, -89.547209771), z_dir=(-1, 0, 0)), keep=Keep.TOP, mode=Mode.PRIVATE)
    fillet_1_piece_21 = fillet_1_piece_21a & fillet_1_piece_21b
    add(fillet_1_piece_21, mode=Mode.SUBTRACT)
    with BuildSketch(Plane(origin=(147.5, 31.5, -90), x_dir=(0, 1, 0), z_dir=(-1, 0, 0))) as fillet_1_piece_22a_section:
        with BuildLine():
            CenterArc((FILLET_1_R, -FILLET_1_R), FILLET_1_R, 90, 90)
            Line((0, -FILLET_1_R), (-FILLET_1_R * 0.02, -FILLET_1_R))
            Line((-FILLET_1_R * 0.02, -FILLET_1_R), (-FILLET_1_R * 0.02, FILLET_1_R * 0.02))
            Line((-FILLET_1_R * 0.02, FILLET_1_R * 0.02), (FILLET_1_R, FILLET_1_R * 0.02))
            Line((FILLET_1_R, FILLET_1_R * 0.02), (FILLET_1_R, 0))
        make_face()
    fillet_1_piece_22a = extrude(amount=80, mode=Mode.PRIVATE)
    fillet_1_piece_22a = split(fillet_1_piece_22a, bisect_by=Plane(origin=(72.5, 31.952790229, -89.547209771), z_dir=(-1, 0, 0)), keep=Keep.TOP, mode=Mode.PRIVATE)
    with BuildSketch(Plane(origin=(72.5, 36.5, -90), x_dir=(-1, 0, 0), z_dir=(0, -1, 0))) as fillet_1_piece_22b_section:
        with BuildLine():
            CenterArc((FILLET_1_R, -FILLET_1_R), FILLET_1_R, 90, 90)
            Line((0, -FILLET_1_R), (-FILLET_1_R * 0.02, -FILLET_1_R))
            Line((-FILLET_1_R * 0.02, -FILLET_1_R), (-FILLET_1_R * 0.02, FILLET_1_R * 0.02))
            Line((-FILLET_1_R * 0.02, FILLET_1_R * 0.02), (FILLET_1_R, FILLET_1_R * 0.02))
            Line((FILLET_1_R, FILLET_1_R * 0.02), (FILLET_1_R, 0))
        make_face()
    fillet_1_piece_22b = extrude(amount=35, mode=Mode.PRIVATE)
    fillet_1_piece_22b = split(fillet_1_piece_22b, bisect_by=Plane(origin=(72.047209771, 31.5, -89.547209771), z_dir=(0, 1, 0)), keep=Keep.TOP, mode=Mode.PRIVATE)
    fillet_1_piece_22 = fillet_1_piece_22a & fillet_1_piece_22b
    add(fillet_1_piece_22, mode=Mode.SUBTRACT)
    with BuildSketch(Plane(origin=(108, 37, -90), x_dir=(-1, 0, 0), z_dir=(0, 1, 0))) as fillet_1_piece_23a_section:
        with BuildLine():
            CenterArc((FILLET_1_R, FILLET_1_R), FILLET_1_R, 180, 90)
            Line((0, FILLET_1_R), (-FILLET_1_R * 0.02, FILLET_1_R))
            Line((-FILLET_1_R * 0.02, FILLET_1_R), (-FILLET_1_R * 0.02, -FILLET_1_R * 0.02))
            Line((-FILLET_1_R * 0.02, -FILLET_1_R * 0.02), (FILLET_1_R, -FILLET_1_R * 0.02))
            Line((FILLET_1_R, -FILLET_1_R * 0.02), (FILLET_1_R, 0))
        make_face()
    fillet_1_piece_23a = extrude(amount=13, mode=Mode.PRIVATE)
    fillet_1_piece_23a = split(fillet_1_piece_23a, bisect_by=Plane(origin=(107.547209771, 42, -89.547209771), z_dir=(0, -1, 0)), keep=Keep.TOP, mode=Mode.PRIVATE)
    with BuildSketch(Plane(origin=(123, 42, -90), x_dir=(0, -1, 0), z_dir=(-1, 0, 0))) as fillet_1_piece_23b_section:
        with BuildLine():
            CenterArc((FILLET_1_R, FILLET_1_R), FILLET_1_R, 180, 90)
            Line((0, FILLET_1_R), (-FILLET_1_R * 0.02, FILLET_1_R))
            Line((-FILLET_1_R * 0.02, FILLET_1_R), (-FILLET_1_R * 0.02, -FILLET_1_R * 0.02))
            Line((-FILLET_1_R * 0.02, -FILLET_1_R * 0.02), (FILLET_1_R, -FILLET_1_R * 0.02))
            Line((FILLET_1_R, -FILLET_1_R * 0.02), (FILLET_1_R, 0))
        make_face()
    fillet_1_piece_23b = extrude(amount=20, mode=Mode.PRIVATE)
    fillet_1_piece_23b = split(fillet_1_piece_23b, bisect_by=Plane(origin=(108, 41.547209771, -89.547209771), z_dir=(-1, 0, 0)), keep=Keep.TOP, mode=Mode.PRIVATE)
    fillet_1_piece_23 = fillet_1_piece_23a & fillet_1_piece_23b
    add(fillet_1_piece_23, mode=Mode.SUBTRACT)
    with BuildSketch(Plane(origin=(108, 42, -90), x_dir=(-1, 0, 0), z_dir=(0, 1, 0))) as fillet_1_piece_24a_section:
        with BuildLine():
            CenterArc((FILLET_1_R, FILLET_1_R), FILLET_1_R, 180, 90)
            Line((0, FILLET_1_R), (-FILLET_1_R * 0.02, FILLET_1_R))
            Line((-FILLET_1_R * 0.02, FILLET_1_R), (-FILLET_1_R * 0.02, -FILLET_1_R * 0.02))
            Line((-FILLET_1_R * 0.02, -FILLET_1_R * 0.02), (FILLET_1_R, -FILLET_1_R * 0.02))
            Line((FILLET_1_R, -FILLET_1_R * 0.02), (FILLET_1_R, 0))
        make_face()
    fillet_1_piece_24a = extrude(amount=13, mode=Mode.PRIVATE)
    fillet_1_piece_24a = split(fillet_1_piece_24a, bisect_by=Plane(origin=(107.547209771, 50, -89.547209771), z_dir=(0, 1, 0)), keep=Keep.TOP, mode=Mode.PRIVATE)
    with BuildSketch(Plane(origin=(103, 50, -90), x_dir=(0, 1, 0), z_dir=(1, 0, 0))) as fillet_1_piece_24b_section:
        with BuildLine():
            CenterArc((FILLET_1_R, FILLET_1_R), FILLET_1_R, 180, 90)
            Line((0, FILLET_1_R), (-FILLET_1_R * 0.02, FILLET_1_R))
            Line((-FILLET_1_R * 0.02, FILLET_1_R), (-FILLET_1_R * 0.02, -FILLET_1_R * 0.02))
            Line((-FILLET_1_R * 0.02, -FILLET_1_R * 0.02), (FILLET_1_R, -FILLET_1_R * 0.02))
            Line((FILLET_1_R, -FILLET_1_R * 0.02), (FILLET_1_R, 0))
        make_face()
    fillet_1_piece_24b = extrude(amount=20, mode=Mode.PRIVATE)
    fillet_1_piece_24b = split(fillet_1_piece_24b, bisect_by=Plane(origin=(108, 50.452790229, -89.547209771), z_dir=(-1, 0, 0)), keep=Keep.TOP, mode=Mode.PRIVATE)
    fillet_1_piece_24 = fillet_1_piece_24a & fillet_1_piece_24b
    add(fillet_1_piece_24, mode=Mode.SUBTRACT)
    with BuildSketch(Plane(origin=(123, 55, -90), x_dir=(1, 0, 0), z_dir=(0, -1, 0))) as fillet_1_piece_25a_section:
        with BuildLine():
            CenterArc((FILLET_1_R, FILLET_1_R), FILLET_1_R, 180, 90)
            Line((0, FILLET_1_R), (-FILLET_1_R * 0.02, FILLET_1_R))
            Line((-FILLET_1_R * 0.02, FILLET_1_R), (-FILLET_1_R * 0.02, -FILLET_1_R * 0.02))
            Line((-FILLET_1_R * 0.02, -FILLET_1_R * 0.02), (FILLET_1_R, -FILLET_1_R * 0.02))
            Line((FILLET_1_R, -FILLET_1_R * 0.02), (FILLET_1_R, 0))
        make_face()
    fillet_1_piece_25a = extrude(amount=13, mode=Mode.PRIVATE)
    fillet_1_piece_25a = split(fillet_1_piece_25a, bisect_by=Plane(origin=(123.452790229, 50, -89.547209771), z_dir=(0, 1, 0)), keep=Keep.TOP, mode=Mode.PRIVATE)
    with BuildSketch(Plane(origin=(108, 50, -90), x_dir=(0, 1, 0), z_dir=(1, 0, 0))) as fillet_1_piece_25b_section:
        with BuildLine():
            CenterArc((FILLET_1_R, FILLET_1_R), FILLET_1_R, 180, 90)
            Line((0, FILLET_1_R), (-FILLET_1_R * 0.02, FILLET_1_R))
            Line((-FILLET_1_R * 0.02, FILLET_1_R), (-FILLET_1_R * 0.02, -FILLET_1_R * 0.02))
            Line((-FILLET_1_R * 0.02, -FILLET_1_R * 0.02), (FILLET_1_R, -FILLET_1_R * 0.02))
            Line((FILLET_1_R, -FILLET_1_R * 0.02), (FILLET_1_R, 0))
        make_face()
    fillet_1_piece_25b = extrude(amount=20, mode=Mode.PRIVATE)
    fillet_1_piece_25b = split(fillet_1_piece_25b, bisect_by=Plane(origin=(123, 50.452790229, -89.547209771), z_dir=(1, 0, 0)), keep=Keep.TOP, mode=Mode.PRIVATE)
    fillet_1_piece_25 = fillet_1_piece_25a & fillet_1_piece_25b
    add(fillet_1_piece_25, mode=Mode.SUBTRACT)
    with BuildSketch(Plane(origin=(128, 42, -90), x_dir=(0, -1, 0), z_dir=(-1, 0, 0))) as fillet_1_piece_26a_section:
        with BuildLine():
            CenterArc((FILLET_1_R, FILLET_1_R), FILLET_1_R, 180, 90)
            Line((0, FILLET_1_R), (-FILLET_1_R * 0.02, FILLET_1_R))
            Line((-FILLET_1_R * 0.02, FILLET_1_R), (-FILLET_1_R * 0.02, -FILLET_1_R * 0.02))
            Line((-FILLET_1_R * 0.02, -FILLET_1_R * 0.02), (FILLET_1_R, -FILLET_1_R * 0.02))
            Line((FILLET_1_R, -FILLET_1_R * 0.02), (FILLET_1_R, 0))
        make_face()
    fillet_1_piece_26a = extrude(amount=20, mode=Mode.PRIVATE)
    fillet_1_piece_26a = split(fillet_1_piece_26a, bisect_by=Plane(origin=(123, 41.547209771, -89.547209771), z_dir=(1, 0, 0)), keep=Keep.TOP, mode=Mode.PRIVATE)
    with BuildSketch(Plane(origin=(123, 50, -90), x_dir=(1, 0, 0), z_dir=(0, -1, 0))) as fillet_1_piece_26b_section:
        with BuildLine():
            CenterArc((FILLET_1_R, FILLET_1_R), FILLET_1_R, 180, 90)
            Line((0, FILLET_1_R), (-FILLET_1_R * 0.02, FILLET_1_R))
            Line((-FILLET_1_R * 0.02, FILLET_1_R), (-FILLET_1_R * 0.02, -FILLET_1_R * 0.02))
            Line((-FILLET_1_R * 0.02, -FILLET_1_R * 0.02), (FILLET_1_R, -FILLET_1_R * 0.02))
            Line((FILLET_1_R, -FILLET_1_R * 0.02), (FILLET_1_R, 0))
        make_face()
    fillet_1_piece_26b = extrude(amount=13, mode=Mode.PRIVATE)
    fillet_1_piece_26b = split(fillet_1_piece_26b, bisect_by=Plane(origin=(123.452790229, 42, -89.547209771), z_dir=(0, -1, 0)), keep=Keep.TOP, mode=Mode.PRIVATE)
    fillet_1_piece_26 = fillet_1_piece_26a & fillet_1_piece_26b
    add(fillet_1_piece_26, mode=Mode.SUBTRACT)

    # 草图13 → 凸台-拉伸4 (add, up to next)
    with BuildSketch(Plane.XY.offset(-85), mode=Mode.PRIVATE) as extrude_4_sk1:
        with Locations((25, 28)):
            Rectangle(SKETCH_13_W, SKETCH_13_H)
    extrude_4_tool1 = extrude(extrude_4_sk1.sketch, amount=EXTRUDE_4_REACH, mode=Mode.PRIVATE) - part.part
    add(extrude_4_tool1.solids().sort_by_distance((25, 28, -85))[0])

    # 草图14 → 切除-拉伸7 (cut, up to next)
    with BuildSketch(Plane(origin=(0, 31, 0), x_dir=(1, 0, 0), z_dir=(0, 1, 0)), mode=Mode.PRIVATE) as cut_extrude_7_sk1:
        with Locations(Location((13, 78, 0), (0, 0, 270))):
            Circle(SKETCH_14_R)
    cut_extrude_7_tool1 = extrude(cut_extrude_7_sk1.sketch, amount=-CUT_EXTRUDE_7_REACH, mode=Mode.PRIVATE) & part.part
    # 草图14 → 切除-拉伸7 (cut, up to next)
    with BuildSketch(Plane(origin=(0, 31, 0), x_dir=(1, 0, 0), z_dir=(0, 1, 0)), mode=Mode.PRIVATE) as cut_extrude_7_sk2:
        with Locations(Location((13, 18, 0), (0, 0, 270))):
            Circle(SKETCH_14_R)
    cut_extrude_7_tool2 = extrude(cut_extrude_7_sk2.sketch, amount=-CUT_EXTRUDE_7_REACH, mode=Mode.PRIVATE) & part.part
    add(cut_extrude_7_tool1.solids().sort_by_distance((13, 31, -78))[0], mode=Mode.SUBTRACT)
    add(cut_extrude_7_tool2.solids().sort_by_distance((13, 31, -18))[0], mode=Mode.SUBTRACT)

    # 草图15 → 切除-拉伸8 (cut, up to next)
    with BuildSketch(Plane(origin=(5, 0, 0), x_dir=(0, 0, -1), z_dir=(1, 0, 0)), mode=Mode.PRIVATE) as cut_extrude_8_sk1:
        with Locations((49.5, 8)):
            Rectangle(SKETCH_15_W, SKETCH_15_H)
    cut_extrude_8_tool1 = extrude(cut_extrude_8_sk1.sketch, amount=-CUT_EXTRUDE_8_REACH, mode=Mode.PRIVATE) & part.part
    add(cut_extrude_8_tool1.solids().sort_by_distance((5, 8, -49.5))[0], mode=Mode.SUBTRACT)

    # 草图16 → 切除-拉伸9 (cut, up to next)
    with BuildSketch(Plane(origin=(5, 0, 0), x_dir=(0, 0, -1), z_dir=(1, 0, 0)), mode=Mode.PRIVATE) as cut_extrude_9_sk1:
        with Locations((45.25, 44)):
            Rectangle(SKETCH_16_W, SKETCH_16_H)
    cut_extrude_9_tool1 = extrude(cut_extrude_9_sk1.sketch, amount=-CUT_EXTRUDE_9_REACH, mode=Mode.PRIVATE) & part.part
    add(cut_extrude_9_tool1.solids().sort_by_distance((5, 44, -45.25))[0], mode=Mode.SUBTRACT)

    # 草图17 → 切除-拉伸10 (cut)
    with BuildSketch(Plane.ZY):
        with Locations((-50.4, 30)):
            Rectangle(SKETCH_17_W, SKETCH_17_H)
    extrude(amount=-CUT_EXTRUDE_10_DEPTH, mode=Mode.SUBTRACT)

    # 草图18 → 切除-拉伸11 (cut, up to next)
    with BuildSketch(Plane.XY.offset(-85), mode=Mode.PRIVATE) as cut_extrude_11_sk1:
        with Locations((21, 53.75)):
            Rectangle(SKETCH_18_W, SKETCH_18_H)
    cut_extrude_11_tool1 = extrude(cut_extrude_11_sk1.sketch, amount=-CUT_EXTRUDE_11_REACH, mode=Mode.PRIVATE) & part.part
    add(cut_extrude_11_tool1.solids().sort_by_distance((21, 53.75, -85))[0], mode=Mode.SUBTRACT)

    # 草图19 → 切除-拉伸12 (cut)
    with BuildSketch(Plane(origin=(0, 75, 0), x_dir=(1, 0, 0), z_dir=(0, 1, 0))):
        with Locations((75, 45)):
            Rectangle(SKETCH_19_W, SKETCH_19_H)
    extrude(amount=-CUT_EXTRUDE_12_DEPTH, mode=Mode.SUBTRACT)

    # 草图20 → 切除-拉伸13 (cut, up to next)
    with BuildSketch(Plane(origin=(0, 0, -90), x_dir=(-1, 0, 0), z_dir=(0, 0, -1)), mode=Mode.PRIVATE) as cut_extrude_13_sk1:
        with Locations((-115.5, 61.371109272)):
            Rectangle(SKETCH_20_W, SKETCH_20_H)
    cut_extrude_13_tool1 = extrude(cut_extrude_13_sk1.sketch, amount=-CUT_EXTRUDE_13_REACH, mode=Mode.PRIVATE) & part.part
    add(cut_extrude_13_tool1.solids().sort_by_distance((115.5, 61.371109, -90))[0], mode=Mode.SUBTRACT)


solid = part.part
